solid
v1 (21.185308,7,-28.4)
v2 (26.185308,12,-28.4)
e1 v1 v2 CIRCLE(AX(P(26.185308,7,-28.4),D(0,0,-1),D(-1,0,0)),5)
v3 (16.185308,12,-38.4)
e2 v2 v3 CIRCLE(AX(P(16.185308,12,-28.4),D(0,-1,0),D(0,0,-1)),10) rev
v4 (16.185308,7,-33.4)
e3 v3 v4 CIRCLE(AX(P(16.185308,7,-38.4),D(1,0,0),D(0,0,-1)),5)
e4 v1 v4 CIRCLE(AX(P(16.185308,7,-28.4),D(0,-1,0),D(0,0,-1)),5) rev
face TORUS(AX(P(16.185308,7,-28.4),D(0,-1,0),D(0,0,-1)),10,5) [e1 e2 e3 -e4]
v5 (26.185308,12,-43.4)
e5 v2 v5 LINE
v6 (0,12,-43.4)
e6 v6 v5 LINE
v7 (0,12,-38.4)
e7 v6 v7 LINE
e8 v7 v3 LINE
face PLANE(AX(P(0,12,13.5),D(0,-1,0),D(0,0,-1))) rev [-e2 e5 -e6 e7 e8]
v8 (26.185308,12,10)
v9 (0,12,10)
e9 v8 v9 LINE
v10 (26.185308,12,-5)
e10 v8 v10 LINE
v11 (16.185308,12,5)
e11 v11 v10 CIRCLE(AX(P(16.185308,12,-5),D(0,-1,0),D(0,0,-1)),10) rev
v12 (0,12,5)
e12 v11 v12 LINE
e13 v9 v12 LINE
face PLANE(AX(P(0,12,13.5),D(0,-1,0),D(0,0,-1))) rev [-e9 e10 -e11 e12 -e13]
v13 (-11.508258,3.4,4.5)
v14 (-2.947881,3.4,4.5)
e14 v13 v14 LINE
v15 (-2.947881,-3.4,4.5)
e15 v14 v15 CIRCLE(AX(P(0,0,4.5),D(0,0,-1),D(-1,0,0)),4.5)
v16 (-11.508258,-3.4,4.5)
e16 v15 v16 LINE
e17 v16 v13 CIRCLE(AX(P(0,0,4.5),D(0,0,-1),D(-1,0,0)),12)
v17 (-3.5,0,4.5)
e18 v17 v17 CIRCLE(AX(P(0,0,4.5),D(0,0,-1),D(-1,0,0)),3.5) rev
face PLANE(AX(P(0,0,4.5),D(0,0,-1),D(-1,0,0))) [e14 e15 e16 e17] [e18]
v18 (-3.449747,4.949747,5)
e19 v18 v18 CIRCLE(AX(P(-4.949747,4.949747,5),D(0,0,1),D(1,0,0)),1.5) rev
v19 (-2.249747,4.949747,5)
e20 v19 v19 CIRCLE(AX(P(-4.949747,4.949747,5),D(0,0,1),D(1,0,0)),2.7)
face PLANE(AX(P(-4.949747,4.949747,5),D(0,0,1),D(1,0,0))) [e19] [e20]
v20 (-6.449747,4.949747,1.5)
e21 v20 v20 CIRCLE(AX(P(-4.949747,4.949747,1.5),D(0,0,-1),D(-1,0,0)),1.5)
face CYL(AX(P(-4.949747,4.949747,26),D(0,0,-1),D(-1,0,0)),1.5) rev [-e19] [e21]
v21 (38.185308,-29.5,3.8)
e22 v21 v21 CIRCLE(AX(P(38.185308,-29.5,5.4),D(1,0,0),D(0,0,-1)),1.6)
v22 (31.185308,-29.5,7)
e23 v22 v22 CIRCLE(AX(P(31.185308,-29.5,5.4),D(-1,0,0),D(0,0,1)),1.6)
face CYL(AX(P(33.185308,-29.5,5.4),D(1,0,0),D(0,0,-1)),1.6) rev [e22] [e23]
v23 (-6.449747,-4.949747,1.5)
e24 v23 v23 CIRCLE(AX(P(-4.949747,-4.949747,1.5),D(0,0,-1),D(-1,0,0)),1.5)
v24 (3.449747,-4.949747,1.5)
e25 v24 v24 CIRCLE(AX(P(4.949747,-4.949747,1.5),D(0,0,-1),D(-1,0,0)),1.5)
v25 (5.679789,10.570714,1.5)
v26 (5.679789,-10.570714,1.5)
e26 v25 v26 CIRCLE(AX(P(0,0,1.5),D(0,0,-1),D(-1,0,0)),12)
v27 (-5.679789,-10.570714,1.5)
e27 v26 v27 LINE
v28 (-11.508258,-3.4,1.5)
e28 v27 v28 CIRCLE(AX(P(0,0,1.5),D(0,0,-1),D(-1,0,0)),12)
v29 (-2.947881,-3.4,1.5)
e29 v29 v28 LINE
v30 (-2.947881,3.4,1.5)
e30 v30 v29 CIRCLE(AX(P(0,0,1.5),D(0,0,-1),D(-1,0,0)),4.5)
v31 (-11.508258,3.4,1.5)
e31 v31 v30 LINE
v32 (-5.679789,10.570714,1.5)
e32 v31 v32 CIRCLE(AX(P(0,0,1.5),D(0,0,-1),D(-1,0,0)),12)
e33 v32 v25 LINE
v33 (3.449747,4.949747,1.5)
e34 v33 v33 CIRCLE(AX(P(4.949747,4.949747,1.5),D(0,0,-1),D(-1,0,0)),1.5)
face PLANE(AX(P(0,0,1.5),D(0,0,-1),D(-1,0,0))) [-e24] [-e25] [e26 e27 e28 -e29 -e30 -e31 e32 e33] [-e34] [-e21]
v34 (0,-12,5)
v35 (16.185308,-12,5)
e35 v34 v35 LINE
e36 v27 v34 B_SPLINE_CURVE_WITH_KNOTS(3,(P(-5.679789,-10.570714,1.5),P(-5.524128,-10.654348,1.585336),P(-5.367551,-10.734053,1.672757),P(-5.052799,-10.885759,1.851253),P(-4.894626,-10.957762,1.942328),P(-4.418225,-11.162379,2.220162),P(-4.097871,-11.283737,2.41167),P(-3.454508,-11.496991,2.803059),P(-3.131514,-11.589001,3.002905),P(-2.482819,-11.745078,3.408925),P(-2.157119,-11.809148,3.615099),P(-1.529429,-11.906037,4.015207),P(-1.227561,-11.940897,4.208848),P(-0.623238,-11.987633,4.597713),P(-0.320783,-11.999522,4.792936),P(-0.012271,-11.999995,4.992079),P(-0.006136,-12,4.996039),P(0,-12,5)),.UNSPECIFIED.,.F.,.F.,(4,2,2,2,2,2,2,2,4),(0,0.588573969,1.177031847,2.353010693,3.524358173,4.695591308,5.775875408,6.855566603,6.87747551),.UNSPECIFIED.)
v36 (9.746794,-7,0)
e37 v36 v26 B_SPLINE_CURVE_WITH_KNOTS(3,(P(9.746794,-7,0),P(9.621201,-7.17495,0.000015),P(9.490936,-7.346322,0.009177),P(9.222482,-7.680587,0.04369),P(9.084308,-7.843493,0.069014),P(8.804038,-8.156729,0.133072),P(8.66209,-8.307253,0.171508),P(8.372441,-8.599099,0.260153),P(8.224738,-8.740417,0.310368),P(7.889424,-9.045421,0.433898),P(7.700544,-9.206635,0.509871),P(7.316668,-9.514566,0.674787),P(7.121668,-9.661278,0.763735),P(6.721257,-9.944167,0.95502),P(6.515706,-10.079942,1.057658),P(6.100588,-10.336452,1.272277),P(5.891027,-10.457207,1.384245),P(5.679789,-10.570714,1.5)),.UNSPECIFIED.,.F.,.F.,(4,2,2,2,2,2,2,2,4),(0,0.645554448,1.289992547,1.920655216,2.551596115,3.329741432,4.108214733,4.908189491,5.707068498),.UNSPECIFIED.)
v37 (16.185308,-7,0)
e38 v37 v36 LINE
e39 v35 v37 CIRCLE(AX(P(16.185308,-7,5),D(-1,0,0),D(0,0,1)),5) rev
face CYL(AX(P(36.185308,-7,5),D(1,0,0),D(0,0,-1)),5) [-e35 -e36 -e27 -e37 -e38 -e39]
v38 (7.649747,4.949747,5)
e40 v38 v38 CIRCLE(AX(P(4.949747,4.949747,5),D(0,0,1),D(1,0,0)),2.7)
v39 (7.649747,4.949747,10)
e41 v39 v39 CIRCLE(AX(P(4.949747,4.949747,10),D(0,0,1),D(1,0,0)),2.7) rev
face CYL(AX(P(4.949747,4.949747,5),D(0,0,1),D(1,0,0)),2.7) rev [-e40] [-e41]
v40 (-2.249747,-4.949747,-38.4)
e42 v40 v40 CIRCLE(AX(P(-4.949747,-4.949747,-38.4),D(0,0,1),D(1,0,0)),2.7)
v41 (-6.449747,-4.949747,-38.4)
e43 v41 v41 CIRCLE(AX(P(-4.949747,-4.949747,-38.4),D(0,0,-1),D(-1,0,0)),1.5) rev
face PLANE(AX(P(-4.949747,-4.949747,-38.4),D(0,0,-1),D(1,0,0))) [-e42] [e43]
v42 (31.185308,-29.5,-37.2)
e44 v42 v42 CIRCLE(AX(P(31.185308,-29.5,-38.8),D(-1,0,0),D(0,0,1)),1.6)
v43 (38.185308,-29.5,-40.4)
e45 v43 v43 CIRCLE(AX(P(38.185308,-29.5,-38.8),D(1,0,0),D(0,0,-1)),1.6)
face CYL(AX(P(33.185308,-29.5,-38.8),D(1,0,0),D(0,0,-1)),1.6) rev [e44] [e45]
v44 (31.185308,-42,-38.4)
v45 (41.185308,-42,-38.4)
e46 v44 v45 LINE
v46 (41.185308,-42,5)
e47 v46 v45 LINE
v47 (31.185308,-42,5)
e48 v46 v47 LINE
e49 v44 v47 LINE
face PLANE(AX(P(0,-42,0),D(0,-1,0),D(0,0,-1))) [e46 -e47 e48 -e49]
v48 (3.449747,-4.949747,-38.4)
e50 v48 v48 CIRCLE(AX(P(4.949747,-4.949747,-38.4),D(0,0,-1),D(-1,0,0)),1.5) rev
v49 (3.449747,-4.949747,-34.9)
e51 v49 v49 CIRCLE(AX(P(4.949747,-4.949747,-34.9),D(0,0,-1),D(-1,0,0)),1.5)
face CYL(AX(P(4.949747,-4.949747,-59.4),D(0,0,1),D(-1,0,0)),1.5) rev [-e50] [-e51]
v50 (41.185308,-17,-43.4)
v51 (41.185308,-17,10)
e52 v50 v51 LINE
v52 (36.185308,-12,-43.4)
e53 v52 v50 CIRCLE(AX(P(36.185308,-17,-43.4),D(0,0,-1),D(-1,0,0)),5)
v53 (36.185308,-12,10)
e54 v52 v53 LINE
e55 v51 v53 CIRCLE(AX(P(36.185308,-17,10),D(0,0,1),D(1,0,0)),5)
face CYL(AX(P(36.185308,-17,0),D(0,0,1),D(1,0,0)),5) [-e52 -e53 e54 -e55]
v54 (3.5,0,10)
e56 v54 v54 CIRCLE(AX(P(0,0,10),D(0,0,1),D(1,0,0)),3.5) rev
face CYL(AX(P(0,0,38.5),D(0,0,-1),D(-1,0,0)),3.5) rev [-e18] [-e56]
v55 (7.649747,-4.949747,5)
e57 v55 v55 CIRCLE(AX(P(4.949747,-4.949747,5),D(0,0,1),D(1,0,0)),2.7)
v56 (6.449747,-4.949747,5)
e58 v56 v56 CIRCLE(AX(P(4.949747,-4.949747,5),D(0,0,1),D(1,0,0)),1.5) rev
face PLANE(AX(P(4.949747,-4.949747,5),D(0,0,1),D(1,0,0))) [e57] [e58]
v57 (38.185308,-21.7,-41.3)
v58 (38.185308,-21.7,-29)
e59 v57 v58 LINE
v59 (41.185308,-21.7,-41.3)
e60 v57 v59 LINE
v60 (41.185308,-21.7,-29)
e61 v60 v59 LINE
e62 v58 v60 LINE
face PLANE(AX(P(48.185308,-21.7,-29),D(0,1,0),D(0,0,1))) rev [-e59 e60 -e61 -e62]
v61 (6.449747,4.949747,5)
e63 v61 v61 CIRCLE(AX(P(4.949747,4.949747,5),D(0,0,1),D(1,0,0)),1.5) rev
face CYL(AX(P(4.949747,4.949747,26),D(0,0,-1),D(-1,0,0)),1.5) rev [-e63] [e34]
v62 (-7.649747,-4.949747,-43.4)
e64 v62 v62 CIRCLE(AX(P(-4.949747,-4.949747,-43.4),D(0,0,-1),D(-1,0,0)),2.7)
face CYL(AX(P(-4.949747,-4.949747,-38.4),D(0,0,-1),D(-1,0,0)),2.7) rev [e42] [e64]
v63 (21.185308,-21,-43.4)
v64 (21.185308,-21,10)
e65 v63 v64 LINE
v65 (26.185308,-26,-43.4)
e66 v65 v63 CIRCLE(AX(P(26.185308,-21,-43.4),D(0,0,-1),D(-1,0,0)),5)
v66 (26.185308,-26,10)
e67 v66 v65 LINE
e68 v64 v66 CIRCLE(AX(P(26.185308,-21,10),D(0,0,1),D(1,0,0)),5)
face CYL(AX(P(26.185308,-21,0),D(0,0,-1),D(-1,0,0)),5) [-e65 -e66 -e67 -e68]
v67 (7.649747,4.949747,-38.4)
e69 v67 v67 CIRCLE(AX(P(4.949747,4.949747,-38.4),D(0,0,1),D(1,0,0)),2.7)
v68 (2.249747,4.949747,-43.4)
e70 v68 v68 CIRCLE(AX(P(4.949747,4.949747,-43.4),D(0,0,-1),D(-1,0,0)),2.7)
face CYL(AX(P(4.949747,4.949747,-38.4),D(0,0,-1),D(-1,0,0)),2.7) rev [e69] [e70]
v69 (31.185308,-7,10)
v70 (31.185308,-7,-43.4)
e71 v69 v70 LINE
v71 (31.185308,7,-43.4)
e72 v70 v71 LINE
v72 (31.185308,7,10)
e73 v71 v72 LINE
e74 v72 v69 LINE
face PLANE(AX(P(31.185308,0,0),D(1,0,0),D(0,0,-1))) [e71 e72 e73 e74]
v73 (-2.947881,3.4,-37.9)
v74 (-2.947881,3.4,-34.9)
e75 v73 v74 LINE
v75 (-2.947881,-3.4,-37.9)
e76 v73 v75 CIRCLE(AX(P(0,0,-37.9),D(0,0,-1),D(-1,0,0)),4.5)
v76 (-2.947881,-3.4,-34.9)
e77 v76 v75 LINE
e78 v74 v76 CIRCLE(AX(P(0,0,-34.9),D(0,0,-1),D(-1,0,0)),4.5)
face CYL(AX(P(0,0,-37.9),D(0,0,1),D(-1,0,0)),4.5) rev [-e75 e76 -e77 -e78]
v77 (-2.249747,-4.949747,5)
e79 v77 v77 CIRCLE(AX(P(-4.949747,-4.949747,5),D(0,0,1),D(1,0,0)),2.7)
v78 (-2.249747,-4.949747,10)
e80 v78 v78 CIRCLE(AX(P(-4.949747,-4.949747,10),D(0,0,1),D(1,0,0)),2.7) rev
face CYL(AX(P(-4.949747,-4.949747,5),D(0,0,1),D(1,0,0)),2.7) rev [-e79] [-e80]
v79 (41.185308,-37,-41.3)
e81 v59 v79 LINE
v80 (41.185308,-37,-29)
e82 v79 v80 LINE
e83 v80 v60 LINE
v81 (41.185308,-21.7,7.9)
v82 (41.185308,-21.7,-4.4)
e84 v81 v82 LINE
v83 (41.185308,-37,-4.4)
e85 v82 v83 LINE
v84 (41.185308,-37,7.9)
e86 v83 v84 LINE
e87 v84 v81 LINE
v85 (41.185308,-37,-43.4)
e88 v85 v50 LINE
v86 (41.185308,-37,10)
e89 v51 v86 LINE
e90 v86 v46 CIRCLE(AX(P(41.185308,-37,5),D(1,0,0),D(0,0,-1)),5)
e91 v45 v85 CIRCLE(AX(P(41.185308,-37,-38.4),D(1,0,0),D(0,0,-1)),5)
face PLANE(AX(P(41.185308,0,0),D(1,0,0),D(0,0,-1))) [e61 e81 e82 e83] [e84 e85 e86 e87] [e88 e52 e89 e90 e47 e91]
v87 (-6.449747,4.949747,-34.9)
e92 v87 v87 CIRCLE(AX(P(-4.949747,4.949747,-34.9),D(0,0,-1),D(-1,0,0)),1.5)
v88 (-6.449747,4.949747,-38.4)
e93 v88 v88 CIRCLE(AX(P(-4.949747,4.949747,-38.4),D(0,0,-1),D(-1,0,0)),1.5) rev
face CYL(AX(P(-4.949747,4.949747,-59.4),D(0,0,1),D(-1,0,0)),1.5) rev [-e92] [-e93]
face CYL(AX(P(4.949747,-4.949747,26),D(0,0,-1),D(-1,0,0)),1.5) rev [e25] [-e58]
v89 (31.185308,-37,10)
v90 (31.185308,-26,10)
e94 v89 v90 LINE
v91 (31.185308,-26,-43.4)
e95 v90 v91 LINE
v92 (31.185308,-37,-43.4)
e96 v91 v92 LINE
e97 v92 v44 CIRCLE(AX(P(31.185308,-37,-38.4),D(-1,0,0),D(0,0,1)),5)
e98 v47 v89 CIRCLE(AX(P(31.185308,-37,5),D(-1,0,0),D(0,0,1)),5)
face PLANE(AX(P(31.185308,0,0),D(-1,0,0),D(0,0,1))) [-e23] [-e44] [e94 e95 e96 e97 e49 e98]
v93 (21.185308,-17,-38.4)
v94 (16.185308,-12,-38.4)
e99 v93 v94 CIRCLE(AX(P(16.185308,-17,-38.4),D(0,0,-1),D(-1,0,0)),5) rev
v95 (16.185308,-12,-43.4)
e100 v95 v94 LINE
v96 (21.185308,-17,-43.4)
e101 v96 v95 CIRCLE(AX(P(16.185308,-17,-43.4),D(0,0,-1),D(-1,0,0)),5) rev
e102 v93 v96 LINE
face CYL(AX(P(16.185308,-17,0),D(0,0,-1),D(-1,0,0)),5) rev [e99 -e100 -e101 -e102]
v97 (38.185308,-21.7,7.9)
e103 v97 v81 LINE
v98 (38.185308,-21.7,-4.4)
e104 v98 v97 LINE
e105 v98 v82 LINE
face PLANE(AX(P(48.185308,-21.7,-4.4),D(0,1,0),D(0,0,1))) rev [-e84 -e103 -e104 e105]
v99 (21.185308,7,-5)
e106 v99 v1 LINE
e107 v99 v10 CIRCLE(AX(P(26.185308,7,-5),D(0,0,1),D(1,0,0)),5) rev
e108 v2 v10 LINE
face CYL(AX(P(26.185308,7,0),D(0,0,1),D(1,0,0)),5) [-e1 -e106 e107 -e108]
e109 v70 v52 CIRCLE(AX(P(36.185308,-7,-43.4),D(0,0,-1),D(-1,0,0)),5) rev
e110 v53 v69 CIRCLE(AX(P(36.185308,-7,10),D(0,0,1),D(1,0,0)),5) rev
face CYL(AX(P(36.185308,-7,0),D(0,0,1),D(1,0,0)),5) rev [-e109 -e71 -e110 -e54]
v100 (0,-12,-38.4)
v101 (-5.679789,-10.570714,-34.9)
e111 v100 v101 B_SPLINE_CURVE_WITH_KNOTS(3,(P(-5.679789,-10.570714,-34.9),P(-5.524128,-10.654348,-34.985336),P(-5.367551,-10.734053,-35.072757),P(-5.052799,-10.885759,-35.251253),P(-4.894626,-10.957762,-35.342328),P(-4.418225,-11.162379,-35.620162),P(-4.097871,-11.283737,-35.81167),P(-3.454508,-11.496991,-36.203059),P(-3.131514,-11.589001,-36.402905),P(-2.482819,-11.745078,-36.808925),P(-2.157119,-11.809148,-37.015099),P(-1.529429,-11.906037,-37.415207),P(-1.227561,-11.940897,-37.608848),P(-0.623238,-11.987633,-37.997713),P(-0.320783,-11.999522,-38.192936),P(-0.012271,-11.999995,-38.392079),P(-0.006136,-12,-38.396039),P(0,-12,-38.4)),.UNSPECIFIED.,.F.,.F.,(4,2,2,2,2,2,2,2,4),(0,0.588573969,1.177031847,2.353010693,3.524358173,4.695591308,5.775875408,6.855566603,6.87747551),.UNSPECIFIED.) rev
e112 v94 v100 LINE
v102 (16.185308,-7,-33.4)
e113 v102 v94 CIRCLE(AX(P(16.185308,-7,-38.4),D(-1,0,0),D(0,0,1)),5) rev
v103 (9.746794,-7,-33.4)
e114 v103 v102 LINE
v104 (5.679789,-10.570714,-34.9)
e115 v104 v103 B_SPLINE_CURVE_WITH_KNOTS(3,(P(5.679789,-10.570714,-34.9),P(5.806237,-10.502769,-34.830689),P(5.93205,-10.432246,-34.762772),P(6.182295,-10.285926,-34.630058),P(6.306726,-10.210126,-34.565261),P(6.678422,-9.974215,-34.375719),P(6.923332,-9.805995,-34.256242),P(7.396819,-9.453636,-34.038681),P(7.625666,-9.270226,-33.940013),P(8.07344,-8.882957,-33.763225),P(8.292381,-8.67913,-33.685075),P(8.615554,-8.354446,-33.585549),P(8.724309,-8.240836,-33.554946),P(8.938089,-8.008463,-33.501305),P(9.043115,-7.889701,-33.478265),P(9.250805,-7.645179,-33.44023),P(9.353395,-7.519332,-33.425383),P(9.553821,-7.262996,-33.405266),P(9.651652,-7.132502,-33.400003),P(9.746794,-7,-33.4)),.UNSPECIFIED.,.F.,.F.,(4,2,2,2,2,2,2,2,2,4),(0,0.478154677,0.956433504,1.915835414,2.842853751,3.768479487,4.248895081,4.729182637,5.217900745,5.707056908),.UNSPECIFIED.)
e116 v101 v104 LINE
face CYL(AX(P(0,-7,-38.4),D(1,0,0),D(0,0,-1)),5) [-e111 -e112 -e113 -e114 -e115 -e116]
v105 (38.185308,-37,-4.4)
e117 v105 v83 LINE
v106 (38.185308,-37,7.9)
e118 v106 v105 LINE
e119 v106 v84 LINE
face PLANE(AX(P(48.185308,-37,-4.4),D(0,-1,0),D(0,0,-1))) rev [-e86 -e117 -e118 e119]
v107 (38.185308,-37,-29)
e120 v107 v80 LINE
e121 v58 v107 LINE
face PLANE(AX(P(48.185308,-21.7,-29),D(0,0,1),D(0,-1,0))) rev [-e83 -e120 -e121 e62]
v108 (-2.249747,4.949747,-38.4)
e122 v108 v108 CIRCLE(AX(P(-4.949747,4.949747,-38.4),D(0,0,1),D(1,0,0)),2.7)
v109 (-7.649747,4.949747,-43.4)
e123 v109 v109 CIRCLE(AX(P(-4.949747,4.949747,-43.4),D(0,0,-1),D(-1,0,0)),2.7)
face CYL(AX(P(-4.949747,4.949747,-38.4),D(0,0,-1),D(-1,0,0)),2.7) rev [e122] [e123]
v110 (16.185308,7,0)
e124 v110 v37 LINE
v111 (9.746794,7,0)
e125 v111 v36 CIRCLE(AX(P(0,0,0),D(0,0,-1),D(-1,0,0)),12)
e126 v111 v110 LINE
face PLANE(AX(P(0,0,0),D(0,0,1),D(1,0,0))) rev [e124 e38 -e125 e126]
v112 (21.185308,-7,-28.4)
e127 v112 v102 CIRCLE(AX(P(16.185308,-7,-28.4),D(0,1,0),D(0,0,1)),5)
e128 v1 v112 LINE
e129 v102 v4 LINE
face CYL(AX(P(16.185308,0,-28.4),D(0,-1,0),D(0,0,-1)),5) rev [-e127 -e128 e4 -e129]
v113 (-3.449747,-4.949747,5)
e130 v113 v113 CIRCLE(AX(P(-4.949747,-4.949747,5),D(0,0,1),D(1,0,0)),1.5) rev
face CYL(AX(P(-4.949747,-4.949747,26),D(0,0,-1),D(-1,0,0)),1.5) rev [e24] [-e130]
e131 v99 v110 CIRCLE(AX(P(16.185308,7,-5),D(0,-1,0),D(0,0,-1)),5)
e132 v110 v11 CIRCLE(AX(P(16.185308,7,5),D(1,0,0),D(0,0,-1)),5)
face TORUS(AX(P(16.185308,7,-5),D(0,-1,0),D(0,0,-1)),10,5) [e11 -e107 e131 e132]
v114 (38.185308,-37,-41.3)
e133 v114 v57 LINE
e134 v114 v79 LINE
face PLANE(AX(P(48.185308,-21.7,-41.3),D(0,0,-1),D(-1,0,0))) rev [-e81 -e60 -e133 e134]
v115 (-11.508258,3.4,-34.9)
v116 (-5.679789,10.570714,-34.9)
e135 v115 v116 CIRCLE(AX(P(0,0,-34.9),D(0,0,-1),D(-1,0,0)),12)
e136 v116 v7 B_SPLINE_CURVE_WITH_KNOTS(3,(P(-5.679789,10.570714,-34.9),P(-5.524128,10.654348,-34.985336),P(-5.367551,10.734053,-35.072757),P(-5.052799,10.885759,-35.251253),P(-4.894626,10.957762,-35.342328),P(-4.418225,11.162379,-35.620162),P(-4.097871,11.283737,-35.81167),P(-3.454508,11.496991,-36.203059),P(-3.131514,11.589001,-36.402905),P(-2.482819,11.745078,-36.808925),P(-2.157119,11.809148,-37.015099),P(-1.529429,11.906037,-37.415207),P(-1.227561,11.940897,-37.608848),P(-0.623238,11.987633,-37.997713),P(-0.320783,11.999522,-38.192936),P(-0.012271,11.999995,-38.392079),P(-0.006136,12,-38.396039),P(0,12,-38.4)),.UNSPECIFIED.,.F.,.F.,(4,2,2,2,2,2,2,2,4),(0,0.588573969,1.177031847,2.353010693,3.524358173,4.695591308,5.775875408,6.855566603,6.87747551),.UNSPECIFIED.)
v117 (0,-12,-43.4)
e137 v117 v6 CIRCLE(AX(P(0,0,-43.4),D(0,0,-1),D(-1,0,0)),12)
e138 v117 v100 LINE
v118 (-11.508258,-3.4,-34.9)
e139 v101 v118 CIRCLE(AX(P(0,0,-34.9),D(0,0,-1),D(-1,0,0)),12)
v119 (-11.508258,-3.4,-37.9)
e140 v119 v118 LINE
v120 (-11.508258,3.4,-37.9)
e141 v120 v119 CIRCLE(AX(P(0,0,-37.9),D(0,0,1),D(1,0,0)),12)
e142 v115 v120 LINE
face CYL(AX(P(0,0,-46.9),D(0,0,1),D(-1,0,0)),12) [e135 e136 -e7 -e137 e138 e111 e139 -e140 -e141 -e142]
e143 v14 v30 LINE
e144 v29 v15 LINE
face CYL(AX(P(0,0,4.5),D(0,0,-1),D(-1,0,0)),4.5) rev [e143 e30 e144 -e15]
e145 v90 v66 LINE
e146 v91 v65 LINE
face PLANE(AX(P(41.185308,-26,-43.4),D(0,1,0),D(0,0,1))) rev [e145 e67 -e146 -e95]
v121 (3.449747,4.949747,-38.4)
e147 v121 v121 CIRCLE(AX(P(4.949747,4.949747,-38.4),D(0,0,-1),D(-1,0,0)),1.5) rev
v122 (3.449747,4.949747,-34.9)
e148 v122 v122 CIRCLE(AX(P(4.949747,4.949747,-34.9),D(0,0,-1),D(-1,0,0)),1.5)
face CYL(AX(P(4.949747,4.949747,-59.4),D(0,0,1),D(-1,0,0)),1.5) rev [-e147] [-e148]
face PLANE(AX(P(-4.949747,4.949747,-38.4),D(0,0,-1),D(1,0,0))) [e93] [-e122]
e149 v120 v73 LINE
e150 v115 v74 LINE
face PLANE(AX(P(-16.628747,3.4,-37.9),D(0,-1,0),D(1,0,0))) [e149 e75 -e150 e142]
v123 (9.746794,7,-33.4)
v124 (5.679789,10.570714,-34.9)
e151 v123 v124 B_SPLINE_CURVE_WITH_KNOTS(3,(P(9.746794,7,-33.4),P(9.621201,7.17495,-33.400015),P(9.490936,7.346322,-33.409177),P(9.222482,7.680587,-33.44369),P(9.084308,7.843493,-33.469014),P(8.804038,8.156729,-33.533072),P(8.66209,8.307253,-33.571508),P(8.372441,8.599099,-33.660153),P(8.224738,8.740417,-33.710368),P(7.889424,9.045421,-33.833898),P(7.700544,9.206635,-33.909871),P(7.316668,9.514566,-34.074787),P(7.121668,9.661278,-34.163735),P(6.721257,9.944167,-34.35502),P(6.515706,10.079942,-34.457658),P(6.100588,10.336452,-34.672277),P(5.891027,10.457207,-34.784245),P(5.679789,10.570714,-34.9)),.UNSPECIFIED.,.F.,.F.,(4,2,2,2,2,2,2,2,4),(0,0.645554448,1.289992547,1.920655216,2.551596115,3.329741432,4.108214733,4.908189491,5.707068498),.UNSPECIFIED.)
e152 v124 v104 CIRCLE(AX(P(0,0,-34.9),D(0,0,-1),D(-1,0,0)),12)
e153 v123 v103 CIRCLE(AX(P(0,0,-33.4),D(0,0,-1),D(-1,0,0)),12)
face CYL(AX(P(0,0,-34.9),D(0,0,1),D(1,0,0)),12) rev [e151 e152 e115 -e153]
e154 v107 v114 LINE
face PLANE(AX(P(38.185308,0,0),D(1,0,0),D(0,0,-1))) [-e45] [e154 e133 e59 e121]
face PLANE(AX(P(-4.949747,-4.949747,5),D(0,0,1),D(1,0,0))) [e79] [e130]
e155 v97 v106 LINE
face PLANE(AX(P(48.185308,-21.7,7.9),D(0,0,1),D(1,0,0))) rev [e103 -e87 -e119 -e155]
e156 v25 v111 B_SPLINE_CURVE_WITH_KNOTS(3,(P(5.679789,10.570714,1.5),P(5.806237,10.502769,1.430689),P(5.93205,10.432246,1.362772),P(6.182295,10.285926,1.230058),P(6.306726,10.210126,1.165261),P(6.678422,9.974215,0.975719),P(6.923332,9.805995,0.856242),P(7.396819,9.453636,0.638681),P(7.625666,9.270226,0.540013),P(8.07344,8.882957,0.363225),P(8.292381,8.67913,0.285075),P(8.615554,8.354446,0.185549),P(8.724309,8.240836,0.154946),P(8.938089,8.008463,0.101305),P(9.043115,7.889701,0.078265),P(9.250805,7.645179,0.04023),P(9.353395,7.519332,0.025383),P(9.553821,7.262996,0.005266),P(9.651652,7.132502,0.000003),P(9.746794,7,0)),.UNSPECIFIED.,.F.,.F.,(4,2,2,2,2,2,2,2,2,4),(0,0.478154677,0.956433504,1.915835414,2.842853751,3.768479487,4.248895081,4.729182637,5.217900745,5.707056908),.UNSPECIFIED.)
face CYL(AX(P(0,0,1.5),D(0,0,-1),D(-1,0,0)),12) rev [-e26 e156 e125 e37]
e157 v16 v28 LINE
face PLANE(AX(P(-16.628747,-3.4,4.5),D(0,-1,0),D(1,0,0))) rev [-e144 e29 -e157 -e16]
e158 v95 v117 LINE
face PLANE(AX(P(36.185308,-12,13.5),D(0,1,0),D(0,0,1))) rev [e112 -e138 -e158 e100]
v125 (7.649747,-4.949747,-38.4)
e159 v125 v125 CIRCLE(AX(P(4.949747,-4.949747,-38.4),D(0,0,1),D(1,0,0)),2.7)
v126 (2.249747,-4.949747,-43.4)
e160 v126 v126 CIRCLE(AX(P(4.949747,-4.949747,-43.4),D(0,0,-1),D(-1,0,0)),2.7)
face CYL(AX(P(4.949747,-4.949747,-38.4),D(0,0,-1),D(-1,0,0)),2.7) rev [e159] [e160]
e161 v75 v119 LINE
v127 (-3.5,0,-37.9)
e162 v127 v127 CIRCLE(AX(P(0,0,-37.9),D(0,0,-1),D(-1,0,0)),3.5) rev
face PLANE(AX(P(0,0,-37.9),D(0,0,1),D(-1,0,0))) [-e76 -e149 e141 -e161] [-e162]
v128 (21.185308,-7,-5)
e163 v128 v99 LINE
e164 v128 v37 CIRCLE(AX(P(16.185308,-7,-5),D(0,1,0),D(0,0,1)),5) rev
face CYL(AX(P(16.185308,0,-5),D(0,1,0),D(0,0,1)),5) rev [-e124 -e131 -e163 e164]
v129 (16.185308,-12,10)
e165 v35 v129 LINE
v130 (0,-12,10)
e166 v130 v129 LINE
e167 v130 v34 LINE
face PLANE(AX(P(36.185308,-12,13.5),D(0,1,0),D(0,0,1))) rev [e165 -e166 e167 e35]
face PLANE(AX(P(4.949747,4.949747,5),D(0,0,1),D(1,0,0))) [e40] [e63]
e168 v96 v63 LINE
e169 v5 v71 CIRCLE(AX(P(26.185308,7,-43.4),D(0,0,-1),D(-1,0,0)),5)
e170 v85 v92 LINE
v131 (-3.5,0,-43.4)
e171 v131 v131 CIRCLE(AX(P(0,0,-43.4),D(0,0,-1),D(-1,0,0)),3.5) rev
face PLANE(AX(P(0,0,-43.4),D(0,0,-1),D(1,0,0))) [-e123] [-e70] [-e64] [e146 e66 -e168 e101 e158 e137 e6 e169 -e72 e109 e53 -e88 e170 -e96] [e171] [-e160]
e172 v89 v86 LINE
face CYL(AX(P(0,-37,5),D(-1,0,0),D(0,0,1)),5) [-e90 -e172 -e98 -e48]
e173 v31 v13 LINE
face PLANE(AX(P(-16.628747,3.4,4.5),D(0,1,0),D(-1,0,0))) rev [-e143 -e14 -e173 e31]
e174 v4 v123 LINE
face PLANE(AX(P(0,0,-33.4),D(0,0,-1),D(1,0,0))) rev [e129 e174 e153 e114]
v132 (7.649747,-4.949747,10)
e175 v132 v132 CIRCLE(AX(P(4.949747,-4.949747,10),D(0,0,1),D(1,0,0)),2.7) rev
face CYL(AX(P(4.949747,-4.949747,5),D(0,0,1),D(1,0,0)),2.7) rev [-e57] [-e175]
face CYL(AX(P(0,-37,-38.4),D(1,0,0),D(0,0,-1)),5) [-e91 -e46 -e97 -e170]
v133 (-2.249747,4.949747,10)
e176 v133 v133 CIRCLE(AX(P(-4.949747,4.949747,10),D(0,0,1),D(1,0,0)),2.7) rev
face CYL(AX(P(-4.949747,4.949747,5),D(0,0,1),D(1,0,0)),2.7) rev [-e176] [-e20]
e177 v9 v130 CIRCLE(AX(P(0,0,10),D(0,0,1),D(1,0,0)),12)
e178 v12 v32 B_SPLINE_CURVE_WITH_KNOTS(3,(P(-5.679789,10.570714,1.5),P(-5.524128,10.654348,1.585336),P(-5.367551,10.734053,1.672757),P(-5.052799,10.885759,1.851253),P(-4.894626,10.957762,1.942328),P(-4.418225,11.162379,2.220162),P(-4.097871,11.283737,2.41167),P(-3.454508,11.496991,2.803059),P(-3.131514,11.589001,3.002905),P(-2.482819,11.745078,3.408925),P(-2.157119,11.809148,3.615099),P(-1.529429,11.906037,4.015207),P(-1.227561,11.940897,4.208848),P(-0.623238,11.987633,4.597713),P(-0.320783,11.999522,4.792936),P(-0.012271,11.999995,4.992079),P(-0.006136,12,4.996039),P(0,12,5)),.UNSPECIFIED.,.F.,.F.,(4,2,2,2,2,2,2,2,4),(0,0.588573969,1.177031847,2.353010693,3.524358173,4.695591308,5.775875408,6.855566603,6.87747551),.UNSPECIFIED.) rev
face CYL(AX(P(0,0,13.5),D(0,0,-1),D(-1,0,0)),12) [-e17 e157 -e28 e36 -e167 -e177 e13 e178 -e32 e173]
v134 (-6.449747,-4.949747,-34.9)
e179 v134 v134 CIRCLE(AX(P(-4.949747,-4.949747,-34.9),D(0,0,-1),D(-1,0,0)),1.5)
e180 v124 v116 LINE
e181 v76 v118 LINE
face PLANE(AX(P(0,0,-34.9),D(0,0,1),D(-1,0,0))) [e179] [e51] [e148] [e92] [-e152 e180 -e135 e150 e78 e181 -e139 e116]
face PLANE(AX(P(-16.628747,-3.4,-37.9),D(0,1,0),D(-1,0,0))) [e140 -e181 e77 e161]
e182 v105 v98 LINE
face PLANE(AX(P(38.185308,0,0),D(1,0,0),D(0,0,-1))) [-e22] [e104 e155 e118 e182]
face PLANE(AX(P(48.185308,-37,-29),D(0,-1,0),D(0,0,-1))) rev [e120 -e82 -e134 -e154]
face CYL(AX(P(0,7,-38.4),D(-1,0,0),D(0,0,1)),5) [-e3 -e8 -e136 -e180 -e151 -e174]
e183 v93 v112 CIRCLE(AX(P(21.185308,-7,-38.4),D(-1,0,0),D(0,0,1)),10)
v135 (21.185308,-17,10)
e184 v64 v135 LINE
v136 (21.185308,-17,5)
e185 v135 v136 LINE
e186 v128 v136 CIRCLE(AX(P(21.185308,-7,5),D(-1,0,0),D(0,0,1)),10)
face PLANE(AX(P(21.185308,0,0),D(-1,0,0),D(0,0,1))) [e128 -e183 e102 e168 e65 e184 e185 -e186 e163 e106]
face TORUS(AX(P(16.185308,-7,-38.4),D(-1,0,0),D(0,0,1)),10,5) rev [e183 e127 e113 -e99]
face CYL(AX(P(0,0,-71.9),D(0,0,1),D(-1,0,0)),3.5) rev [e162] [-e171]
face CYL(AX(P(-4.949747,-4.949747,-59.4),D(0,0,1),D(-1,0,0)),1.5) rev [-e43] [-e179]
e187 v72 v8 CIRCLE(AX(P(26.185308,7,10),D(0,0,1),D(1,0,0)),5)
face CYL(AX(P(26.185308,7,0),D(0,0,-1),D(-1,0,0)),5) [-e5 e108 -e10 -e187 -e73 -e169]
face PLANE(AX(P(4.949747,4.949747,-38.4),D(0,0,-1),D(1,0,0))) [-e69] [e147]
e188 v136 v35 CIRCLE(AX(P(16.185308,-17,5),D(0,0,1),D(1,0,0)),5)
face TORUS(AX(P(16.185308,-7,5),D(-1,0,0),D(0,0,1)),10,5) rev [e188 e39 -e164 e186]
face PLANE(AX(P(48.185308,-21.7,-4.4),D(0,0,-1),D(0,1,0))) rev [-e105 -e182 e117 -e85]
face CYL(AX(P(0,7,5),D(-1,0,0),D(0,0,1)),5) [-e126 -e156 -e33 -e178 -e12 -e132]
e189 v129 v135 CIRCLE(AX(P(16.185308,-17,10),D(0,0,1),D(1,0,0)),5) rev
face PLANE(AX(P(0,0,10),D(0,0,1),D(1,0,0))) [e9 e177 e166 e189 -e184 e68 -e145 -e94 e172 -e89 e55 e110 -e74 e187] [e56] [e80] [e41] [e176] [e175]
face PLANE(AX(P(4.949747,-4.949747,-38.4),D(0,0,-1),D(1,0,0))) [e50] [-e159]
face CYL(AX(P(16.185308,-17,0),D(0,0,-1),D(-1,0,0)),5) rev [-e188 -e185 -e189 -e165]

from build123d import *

# Parameters (mm, degrees)
EXTRUDE_1_DEPTH      = 13.5
SKETCH_5_R           = 10.1
CUT_EXTRUDE_2_DEPTH  = 1.5
SKETCH_7_R           = 3.5
CUT_EXTRUDE_3_DEPTH  = 37
SKETCH_35_R          = 4.5
CUT_EXTRUDE_22_DEPTH = 3
SKETCH_9_R           = 1.5
CUT_EXTRUDE_4_DEPTH  = 24.5
SKETCH_11_W          = 60.4
SKETCH_11_H          = 24
EXTRUDE_2_DEPTH      = 10
SKETCH_12_R          = 2.7
CUT_EXTRUDE_5_DEPTH  = 8.5
SKETCH_18_R          = 12
CUT_EXTRUDE_9_DEPTH  = 1.5
SKETCH_19_W          = 16.628747166
SKETCH_19_H          = 6.8
CUT_EXTRUDE_10_DEPTH = 3
SKETCH_20_W          = 76.507524202
SKETCH_20_H          = 37.102074034
CUT_EXTRUDE_11_DEPTH = 3.5
SKETCH_21_W          = 10
SKETCH_21_H          = 53.4
EXTRUDE_3_DEPTH      = 30
SKETCH_22_W          = 53.4
SKETCH_22_H          = 54
EXTRUDE_4_DEPTH      = 15
SKETCH_24_W          = 12.3
SKETCH_24_H          = 15.3
CUT_EXTRUDE_12_DEPTH = 3
SKETCH_26_R          = 1.6
CUT_EXTRUDE_14_DEPTH = 15
SKETCH_27_W          = 15
SKETCH_27_H          = 53.4
CUT_EXTRUDE_15_DEPTH = 24
SKETCH_25_W          = 53.4
SKETCH_25_H          = 16
CUT_EXTRUDE_16_DEPTH = 15
SKETCH_28_W          = 53.4
SKETCH_28_H          = 16
SKETCH_28_R          = 1.6
EXTRUDE_5_DEPTH      = 10
SKETCH_29_W          = 12.3
SKETCH_29_H          = 15.3
SKETCH_29_R          = 1.6
CUT_EXTRUDE_17_DEPTH = 10
SKETCH_30_W          = 53.4
SKETCH_30_H          = 30
CUT_EXTRUDE_18_DEPTH = 10
EXTRUDE_6_DEPTH      = 5
SKETCH_32_W          = 53.4
SKETCH_32_H          = 24
CUT_EXTRUDE_19_DEPTH = 5
FILLET_7_R           = 5
FILLET_8_R           = 5
FILLET_9_R           = 5
FILLET_10_R          = 5


# Some blends are built 0.0001 mm under size
with BuildPart() as part:
    # 草图1 → 凸台-拉伸1 (new body)
    with BuildSketch(Plane.XY):
        with BuildLine():
            Line((0, 12), (36.185307738, 12))
            Line((36.185307738, 12), (36.185307738, -12))
            Line((36.185307738, -12), (0, -12))
            ThreePointArc((0, -12), (-12, 0), (0, 12))
        make_face()
    extrude(amount=EXTRUDE_1_DEPTH)

    # 草图5 → 切除-拉伸2 (cut)
    with BuildSketch(Plane(origin=(0, 0, 0), x_dir=(-1, 0, 0), z_dir=(0, 0, -1))):
        Circle(SKETCH_5_R)
    extrude(amount=-CUT_EXTRUDE_2_DEPTH, mode=Mode.SUBTRACT)

    # 草图7 → 切除-拉伸3 (cut)
    with BuildSketch(Plane(origin=(0, 0, 1.5), x_dir=(-1, 0, 0), z_dir=(0, 0, -1))):
        Circle(SKETCH_7_R)
    extrude(amount=-CUT_EXTRUDE_3_DEPTH, mode=Mode.SUBTRACT)

    # 草图35 → 切除-拉伸22 (cut)
    with BuildSketch(Plane(origin=(0, 0, 1.5), x_dir=(-1, 0, 0), z_dir=(0, 0, -1))):
        Circle(SKETCH_35_R)
    extrude(amount=-CUT_EXTRUDE_22_DEPTH, mode=Mode.SUBTRACT)

    # 草图9 → 切除-拉伸4 (cut)
    with BuildSketch(Plane(origin=(0, 0, 1.5), x_dir=(-1, 0, 0), z_dir=(0, 0, -1))):
        with Locations((-4.949747468, 4.949747468)):
            Circle(SKETCH_9_R)
        with Locations((4.949747468, 4.949747468)):
            Circle(SKETCH_9_R)
        with Locations((4.949747468, -4.949747468)):
            Circle(SKETCH_9_R)
        with Locations((-4.949747468, -4.949747468)):
            Circle(SKETCH_9_R)
    extrude(amount=-CUT_EXTRUDE_4_DEPTH, mode=Mode.SUBTRACT)


with BuildPart() as body_2:
    # 镜向14: mirrored copy
    add(part.part.mirror(Plane(origin=(0, 0, -16.7), x_dir=(1, 0, 0), z_dir=(0, 0, -1))))


with BuildPart() as part_1:
    add(part.part)

    add(body_2.part)  # 凸台-拉伸2 merges body 2
    # 草图11 → 凸台-拉伸2 (add)
    with BuildSketch(Plane(origin=(36.185307738, 0, 0), x_dir=(0, 0, -1), z_dir=(1, 0, 0))):
        with Locations((16.7, 0)):
            Rectangle(SKETCH_11_W, SKETCH_11_H)
    extrude(amount=-EXTRUDE_2_DEPTH)

    # 草图12 → 切除-拉伸5 (cut)
    with BuildSketch(Plane.XY.offset(13.5)):
        with Locations((4.949747468, 4.949747468)):
            Circle(SKETCH_12_R)
        with Locations((4.949747468, -4.949747468)):
            Circle(SKETCH_12_R)
        with Locations((-4.949747468, -4.949747468)):
            Circle(SKETCH_12_R)
        with Locations((-4.949747468, 4.949747468)):
            Circle(SKETCH_12_R)
    cut_extrude_5 = extrude(amount=-CUT_EXTRUDE_5_DEPTH, mode=Mode.SUBTRACT)

    # 草图18 → 切除-拉伸9 (cut)
    with BuildSketch(Plane(origin=(0, 0, 0), x_dir=(-1, 0, 0), z_dir=(0, 0, -1))):
        Circle(SKETCH_18_R)
    cut_extrude_9 = extrude(amount=-CUT_EXTRUDE_9_DEPTH, mode=Mode.SUBTRACT)

    # 草图19 → 切除-拉伸10 (cut)
    with BuildSketch(Plane(origin=(0, 0, 1.5), x_dir=(-1, 0, 0), z_dir=(0, 0, -1))):
        with Locations((8.314373583, 0)):
            Rectangle(SKETCH_19_W, SKETCH_19_H)
    cut_extrude_10 = extrude(amount=-CUT_EXTRUDE_10_DEPTH, mode=Mode.SUBTRACT)

    # 草图20 → 切除-拉伸11 (cut)
    with BuildSketch(Plane.XY.offset(13.5)):
        with Locations((20.283666709, 0.248055891)):
            Rectangle(SKETCH_20_W, SKETCH_20_H)
    cut_extrude_11 = extrude(amount=-CUT_EXTRUDE_11_DEPTH, mode=Mode.SUBTRACT)

    # 镜向24: 切除-拉伸5, 切除-拉伸9, 切除-拉伸10 across plane
    add(cut_extrude_5.mirror(Plane(origin=(0, 0, -16.7), x_dir=(1, 0, 0), z_dir=(0, 0, -1))), mode=Mode.SUBTRACT)
    add(cut_extrude_9.mirror(Plane(origin=(0, 0, -16.7), x_dir=(1, 0, 0), z_dir=(0, 0, -1))), mode=Mode.SUBTRACT)
    add(cut_extrude_10.mirror(Plane(origin=(0, 0, -16.7), x_dir=(1, 0, 0), z_dir=(0, 0, -1))), mode=Mode.SUBTRACT)

    # 镜向26: 切除-拉伸11 across plane
    add(cut_extrude_11.mirror(Plane(origin=(0, 0, -16.7), x_dir=(1, 0, 0), z_dir=(0, 0, -1))), mode=Mode.SUBTRACT)

    # 草图21 → 凸台-拉伸3 (add)
    with BuildSketch(Plane.XZ.offset(12)):
        with Locations((31.185307738, -16.7)):
            Rectangle(SKETCH_21_W, SKETCH_21_H)
    extrude(amount=EXTRUDE_3_DEPTH)

    # 草图22 → 凸台-拉伸4 (add)
    with BuildSketch(Plane(origin=(36.185307738, 0, 0), x_dir=(0, 0, -1), z_dir=(1, 0, 0))):
        with Locations((16.7, -15)):
            Rectangle(SKETCH_22_W, SKETCH_22_H)
    extrude(amount=EXTRUDE_4_DEPTH)

    # 草图24 → 切除-拉伸12 (cut)
    with BuildSketch(Plane(origin=(51.185307738, 0, 0), x_dir=(0, 0, -1), z_dir=(1, 0, 0))):
        with Locations((35.15, -29.35)):
            Rectangle(SKETCH_24_W, SKETCH_24_H)
        with Locations((-1.75, -29.35)):
            Rectangle(SKETCH_24_W, SKETCH_24_H)
    extrude(amount=-CUT_EXTRUDE_12_DEPTH, mode=Mode.SUBTRACT)

    # 草图26 → 切除-拉伸14 (cut)
    with BuildSketch(Plane(origin=(48.185307738, 0, 0), x_dir=(0, 0, -1), z_dir=(1, 0, 0))):
        with Locations((38.8, -29.5)):
            Circle(SKETCH_26_R)
        with Locations(Location((-5.4, -29.5, 0), (0, 0, 180))):
            Circle(SKETCH_26_R)
    extrude(amount=-CUT_EXTRUDE_14_DEPTH, mode=Mode.SUBTRACT)

    # 草图27 → 切除-拉伸15 (cut)
    with BuildSketch(Plane(origin=(0, 12, 0), x_dir=(1, 0, 0), z_dir=(0, 1, 0))):
        with Locations((43.685307738, 16.7)):
            Rectangle(SKETCH_27_W, SKETCH_27_H)
    extrude(amount=-CUT_EXTRUDE_15_DEPTH, mode=Mode.SUBTRACT)

    # 草图25 → 切除-拉伸16 (cut)
    with BuildSketch(Plane.ZY.offset(-26.185307738)):
        with Locations((-16.7, -34)):
            Rectangle(SKETCH_25_W, SKETCH_25_H)
    extrude(amount=-CUT_EXTRUDE_16_DEPTH, mode=Mode.SUBTRACT)

    # 草图28 → 凸台-拉伸5 (add)
    with BuildSketch(Plane.ZY.offset(-41.185307738)):
        with Locations((-16.7, -34)):
            Rectangle(SKETCH_28_W, SKETCH_28_H)
        with Locations((5.4, -29.5)):
            Circle(SKETCH_28_R, mode=Mode.SUBTRACT)
        with Locations(Location((-38.8, -29.5, 0), (0, 0, 180))):
            Circle(SKETCH_28_R, mode=Mode.SUBTRACT)
    extrude(amount=EXTRUDE_5_DEPTH)

    # 草图29 → 切除-拉伸17 (cut)
    # profile 1 of 2: a face of its own
    with BuildSketch(Plane(origin=(48.185307738, 0, 0), x_dir=(0, 0, -1), z_dir=(1, 0, 0))):
        with Locations((-1.75, -29.35)):
            Rectangle(SKETCH_29_W, SKETCH_29_H)
        with Locations((-5.4, -29.5)):
            Circle(SKETCH_29_R, mode=Mode.SUBTRACT)
    # profile 2 of 2: a face of its own
    with BuildSketch(Plane(origin=(48.185307738, 0, 0), x_dir=(0, 0, -1), z_dir=(1, 0, 0))):
        with Locations((35.15, -29.35)):
            Rectangle(SKETCH_29_W, SKETCH_29_H)
        with Locations((38.8, -29.5)):
            Circle(SKETCH_29_R, mode=Mode.SUBTRACT)
    extrude(amount=-CUT_EXTRUDE_17_DEPTH, mode=Mode.SUBTRACT)

    # 草图30 → 切除-拉伸18 (cut)
    with BuildSketch(Plane(origin=(51.185307738, 0, 0), x_dir=(0, 0, -1), z_dir=(1, 0, 0))):
        with Locations((16.7, -27)):
            Rectangle(SKETCH_30_W, SKETCH_30_H)
    extrude(amount=-CUT_EXTRUDE_18_DEPTH, mode=Mode.SUBTRACT)

    # 草图31 → 凸台-拉伸6 (add)
    with BuildSketch(Plane.ZY.offset(-26.185307738)):
        Polygon((-43.4, -12), (-43.4, -26), (10, -26), (10, -12), (0, -12), (0, 12), (-33.4, 12), (-33.4, -12), align=None)
    extrude(amount=EXTRUDE_6_DEPTH)

    # 草图32 → 切除-拉伸19 (cut)
    with BuildSketch(Plane(origin=(36.185307738, 0, 0), x_dir=(0, 0, -1), z_dir=(1, 0, 0))):
        with Locations((16.7, 0)):
            Rectangle(SKETCH_32_W, SKETCH_32_H)
    extrude(amount=-CUT_EXTRUDE_19_DEPTH, mode=Mode.SUBTRACT)

    # 圆角7
    # the kernel refuses this fillet: 5 mm, written as the material it takes off along each edge
    with BuildSketch(Plane(origin=(21.185307738, -12, 0), x_dir=(0, 0, 1), z_dir=(-1, 0, 0))) as fillet_7_piece_1:
        with BuildLine():
            CenterArc((FILLET_7_R, FILLET_7_R), FILLET_7_R, 180, 90)
            Line((0, FILLET_7_R), (0, 0))
            Line((0, 0), (FILLET_7_R, 0))
        make_face()
    extrude(amount=33.685307738, mode=Mode.SUBTRACT)
    with BuildSketch(Plane(origin=(21.185307738, -12, -33.4), x_dir=(0, 0, -1), z_dir=(-1, 0, 0))) as fillet_7_piece_2:
        with BuildLine():
            CenterArc((FILLET_7_R, -FILLET_7_R), FILLET_7_R, 90, 90)
            Line((0, -FILLET_7_R), (0, 0))
            Line((0, 0), (FILLET_7_R, 0))
        make_face()
    extrude(amount=33.685307738, mode=Mode.SUBTRACT)
    # the kernel refuses this fillet: 5 mm, written as the material it adds along each edge
    with BuildSketch(Plane(origin=(21.185307738, -12, -38.4), x_dir=(0, -1, 0), z_dir=(0, 0, -1)), Plane(origin=(21.185307738, -12, 10), x_dir=(0, -1, 0), z_dir=(0, 0, -1))) as fillet_7_2_piece_1:
        with BuildLine():
            CenterArc((FILLET_7_R, FILLET_7_R), FILLET_7_R, 180, 90)
            Line((0, FILLET_7_R), (0, 0))
            Line((0, 0), (FILLET_7_R, 0))
        make_face()
    extrude(amount=5)
    with BuildSketch(Plane(origin=(21.185307738, -7, 0), x_dir=(-1, 0, 0), z_dir=(0, 1, 0))) as fillet_7_2_piece_2:
        with BuildLine():
            CenterArc((FILLET_7_R, -FILLET_7_R), FILLET_7_R, 90, 90)
            Line((0, -FILLET_7_R), (0, 0))
            Line((0, 0), (FILLET_7_R, 0))
        make_face()
    extrude(amount=19)
    with BuildSketch(Plane(origin=(21.185307738, 12, -33.4), x_dir=(0, 0, 1), z_dir=(0, -1, 0))) as fillet_7_2_piece_3:
        with BuildLine():
            CenterArc((FILLET_7_R, FILLET_7_R), FILLET_7_R, 180, 90)
            Line((0, FILLET_7_R), (0, 0))
            Line((0, 0), (FILLET_7_R, 0))
        make_face()
    extrude(amount=19)
    with BuildSketch(Plane(origin=(21.185307738, -7, -38.4), x_dir=(0, -1, 0), z_dir=(0, 0, -1))) as fillet_7_2_piece_4:
        with BuildLine():
            CenterArc((5 + FILLET_7_R, FILLET_7_R), FILLET_7_R, 180, 90)
            Line((5, FILLET_7_R), (5, 0))
            Line((5, 0), (5 + FILLET_7_R, 0))
        make_face()
    revolve(axis=Axis((21.185307738, -7, -38.4), (-1, 0, 0)), revolution_arc=90)
    with BuildSketch(Plane(origin=(21.185307738, -7, 5), x_dir=(0, -1, 0), z_dir=(0, 0, 1))) as fillet_7_2_piece_5:
        with BuildLine():
            CenterArc((5 + FILLET_7_R, -FILLET_7_R), FILLET_7_R, 90, 90)
            Line((5, -FILLET_7_R), (5, 0))
            Line((5, 0), (5 + FILLET_7_R, 0))
        make_face()
    revolve(axis=Axis((21.185307738, -7, 5), (1, 0, 0)), revolution_arc=90)
    # the kernel refuses this fillet: 5 mm, written as the material it takes off along each edge
    with BuildSketch(Plane(origin=(-12.5, 12, 0), x_dir=(0, 0, 1), z_dir=(1, 0, 0))) as fillet_7_3_piece_1:
        with BuildLine():
            CenterArc((FILLET_7_R, FILLET_7_R), FILLET_7_R, 180, 90)
            Line((0, FILLET_7_R), (0, 0))
            Line((0, 0), (FILLET_7_R, 0))
        make_face()
    extrude(amount=28.685307738, mode=Mode.SUBTRACT)
    with BuildSketch(Plane(origin=(-12.5, 12, -33.4), x_dir=(0, 0, -1), z_dir=(1, 0, 0))) as fillet_7_3_piece_2:
        with BuildLine():
            CenterArc((FILLET_7_R, -FILLET_7_R), FILLET_7_R, 90, 90)
            Line((0, -FILLET_7_R), (0, 0))
            Line((0, 0), (FILLET_7_R, 0))
        make_face()
    extrude(amount=28.685307738, mode=Mode.SUBTRACT)
    with BuildSketch(Plane(origin=(21.185307738, 12, -5), x_dir=(1, 0, 0), z_dir=(0, 0, -1))) as fillet_7_3_piece_3:
        with BuildLine():
            CenterArc((FILLET_7_R, FILLET_7_R), FILLET_7_R, 180, 90)
            Line((0, FILLET_7_R), (0, 0))
            Line((0, 0), (FILLET_7_R, 0))
        make_face()
    extrude(amount=23.4, mode=Mode.SUBTRACT)
    with BuildSketch(Plane(origin=(16.185307738, 12, -5), x_dir=(0, 0, 1), z_dir=(-1, 0, 0))) as fillet_7_3_piece_4:
        with BuildLine():
            CenterArc((5 + FILLET_7_R, -FILLET_7_R), FILLET_7_R, 90, 90)
            Line((5, -FILLET_7_R), (5, 0))
            Line((5, 0), (5 + FILLET_7_R, 0))
        make_face()
    revolve(axis=Axis((16.185307738, 12, -5), (0, 1, 0)), revolution_arc=90, mode=Mode.SUBTRACT)
    with BuildSketch(Plane(origin=(16.185307738, 12, -28.4), x_dir=(1, 0, 0), z_dir=(0, 0, 1))) as fillet_7_3_piece_5:
        with BuildLine():
            CenterArc((5 + FILLET_7_R, -FILLET_7_R), FILLET_7_R, 90, 90)
            Line((5, -FILLET_7_R), (5, 0))
            Line((5, 0), (5 + FILLET_7_R, 0))
        make_face()
    revolve(axis=Axis((16.185307738, 12, -28.4), (0, 1, 0)), revolution_arc=90, mode=Mode.SUBTRACT)

    # 圆角8
    fillet_8_edges = [part_1.edges().sort_by_distance(p)[0] for p in [
        (21.185307738, -26, -16.7),
        (31.185307738, 12, -16.7),
        (31.185307738, -12, -16.7),
    ]]
    fillet(fillet_8_edges, radius=FILLET_8_R - 0.0001)  # a hair under: the kernel refuses the full size

    # 圆角9
    fillet_9_edges = [part_1.edges().sort_by_distance(p)[0] for p in [
        (36.185307738, -42, -43.4),
        (36.185307738, -42, 10),
    ]]
    fillet(fillet_9_edges, radius=FILLET_9_R)

    # 圆角10
    fillet_10_edges = [part_1.edges().sort_by_distance(p)[0] for p in [
        (41.185307738, -12, -16.7),
    ]]
    fillet(fillet_10_edges, radius=FILLET_10_R)


solid = part_1.part
